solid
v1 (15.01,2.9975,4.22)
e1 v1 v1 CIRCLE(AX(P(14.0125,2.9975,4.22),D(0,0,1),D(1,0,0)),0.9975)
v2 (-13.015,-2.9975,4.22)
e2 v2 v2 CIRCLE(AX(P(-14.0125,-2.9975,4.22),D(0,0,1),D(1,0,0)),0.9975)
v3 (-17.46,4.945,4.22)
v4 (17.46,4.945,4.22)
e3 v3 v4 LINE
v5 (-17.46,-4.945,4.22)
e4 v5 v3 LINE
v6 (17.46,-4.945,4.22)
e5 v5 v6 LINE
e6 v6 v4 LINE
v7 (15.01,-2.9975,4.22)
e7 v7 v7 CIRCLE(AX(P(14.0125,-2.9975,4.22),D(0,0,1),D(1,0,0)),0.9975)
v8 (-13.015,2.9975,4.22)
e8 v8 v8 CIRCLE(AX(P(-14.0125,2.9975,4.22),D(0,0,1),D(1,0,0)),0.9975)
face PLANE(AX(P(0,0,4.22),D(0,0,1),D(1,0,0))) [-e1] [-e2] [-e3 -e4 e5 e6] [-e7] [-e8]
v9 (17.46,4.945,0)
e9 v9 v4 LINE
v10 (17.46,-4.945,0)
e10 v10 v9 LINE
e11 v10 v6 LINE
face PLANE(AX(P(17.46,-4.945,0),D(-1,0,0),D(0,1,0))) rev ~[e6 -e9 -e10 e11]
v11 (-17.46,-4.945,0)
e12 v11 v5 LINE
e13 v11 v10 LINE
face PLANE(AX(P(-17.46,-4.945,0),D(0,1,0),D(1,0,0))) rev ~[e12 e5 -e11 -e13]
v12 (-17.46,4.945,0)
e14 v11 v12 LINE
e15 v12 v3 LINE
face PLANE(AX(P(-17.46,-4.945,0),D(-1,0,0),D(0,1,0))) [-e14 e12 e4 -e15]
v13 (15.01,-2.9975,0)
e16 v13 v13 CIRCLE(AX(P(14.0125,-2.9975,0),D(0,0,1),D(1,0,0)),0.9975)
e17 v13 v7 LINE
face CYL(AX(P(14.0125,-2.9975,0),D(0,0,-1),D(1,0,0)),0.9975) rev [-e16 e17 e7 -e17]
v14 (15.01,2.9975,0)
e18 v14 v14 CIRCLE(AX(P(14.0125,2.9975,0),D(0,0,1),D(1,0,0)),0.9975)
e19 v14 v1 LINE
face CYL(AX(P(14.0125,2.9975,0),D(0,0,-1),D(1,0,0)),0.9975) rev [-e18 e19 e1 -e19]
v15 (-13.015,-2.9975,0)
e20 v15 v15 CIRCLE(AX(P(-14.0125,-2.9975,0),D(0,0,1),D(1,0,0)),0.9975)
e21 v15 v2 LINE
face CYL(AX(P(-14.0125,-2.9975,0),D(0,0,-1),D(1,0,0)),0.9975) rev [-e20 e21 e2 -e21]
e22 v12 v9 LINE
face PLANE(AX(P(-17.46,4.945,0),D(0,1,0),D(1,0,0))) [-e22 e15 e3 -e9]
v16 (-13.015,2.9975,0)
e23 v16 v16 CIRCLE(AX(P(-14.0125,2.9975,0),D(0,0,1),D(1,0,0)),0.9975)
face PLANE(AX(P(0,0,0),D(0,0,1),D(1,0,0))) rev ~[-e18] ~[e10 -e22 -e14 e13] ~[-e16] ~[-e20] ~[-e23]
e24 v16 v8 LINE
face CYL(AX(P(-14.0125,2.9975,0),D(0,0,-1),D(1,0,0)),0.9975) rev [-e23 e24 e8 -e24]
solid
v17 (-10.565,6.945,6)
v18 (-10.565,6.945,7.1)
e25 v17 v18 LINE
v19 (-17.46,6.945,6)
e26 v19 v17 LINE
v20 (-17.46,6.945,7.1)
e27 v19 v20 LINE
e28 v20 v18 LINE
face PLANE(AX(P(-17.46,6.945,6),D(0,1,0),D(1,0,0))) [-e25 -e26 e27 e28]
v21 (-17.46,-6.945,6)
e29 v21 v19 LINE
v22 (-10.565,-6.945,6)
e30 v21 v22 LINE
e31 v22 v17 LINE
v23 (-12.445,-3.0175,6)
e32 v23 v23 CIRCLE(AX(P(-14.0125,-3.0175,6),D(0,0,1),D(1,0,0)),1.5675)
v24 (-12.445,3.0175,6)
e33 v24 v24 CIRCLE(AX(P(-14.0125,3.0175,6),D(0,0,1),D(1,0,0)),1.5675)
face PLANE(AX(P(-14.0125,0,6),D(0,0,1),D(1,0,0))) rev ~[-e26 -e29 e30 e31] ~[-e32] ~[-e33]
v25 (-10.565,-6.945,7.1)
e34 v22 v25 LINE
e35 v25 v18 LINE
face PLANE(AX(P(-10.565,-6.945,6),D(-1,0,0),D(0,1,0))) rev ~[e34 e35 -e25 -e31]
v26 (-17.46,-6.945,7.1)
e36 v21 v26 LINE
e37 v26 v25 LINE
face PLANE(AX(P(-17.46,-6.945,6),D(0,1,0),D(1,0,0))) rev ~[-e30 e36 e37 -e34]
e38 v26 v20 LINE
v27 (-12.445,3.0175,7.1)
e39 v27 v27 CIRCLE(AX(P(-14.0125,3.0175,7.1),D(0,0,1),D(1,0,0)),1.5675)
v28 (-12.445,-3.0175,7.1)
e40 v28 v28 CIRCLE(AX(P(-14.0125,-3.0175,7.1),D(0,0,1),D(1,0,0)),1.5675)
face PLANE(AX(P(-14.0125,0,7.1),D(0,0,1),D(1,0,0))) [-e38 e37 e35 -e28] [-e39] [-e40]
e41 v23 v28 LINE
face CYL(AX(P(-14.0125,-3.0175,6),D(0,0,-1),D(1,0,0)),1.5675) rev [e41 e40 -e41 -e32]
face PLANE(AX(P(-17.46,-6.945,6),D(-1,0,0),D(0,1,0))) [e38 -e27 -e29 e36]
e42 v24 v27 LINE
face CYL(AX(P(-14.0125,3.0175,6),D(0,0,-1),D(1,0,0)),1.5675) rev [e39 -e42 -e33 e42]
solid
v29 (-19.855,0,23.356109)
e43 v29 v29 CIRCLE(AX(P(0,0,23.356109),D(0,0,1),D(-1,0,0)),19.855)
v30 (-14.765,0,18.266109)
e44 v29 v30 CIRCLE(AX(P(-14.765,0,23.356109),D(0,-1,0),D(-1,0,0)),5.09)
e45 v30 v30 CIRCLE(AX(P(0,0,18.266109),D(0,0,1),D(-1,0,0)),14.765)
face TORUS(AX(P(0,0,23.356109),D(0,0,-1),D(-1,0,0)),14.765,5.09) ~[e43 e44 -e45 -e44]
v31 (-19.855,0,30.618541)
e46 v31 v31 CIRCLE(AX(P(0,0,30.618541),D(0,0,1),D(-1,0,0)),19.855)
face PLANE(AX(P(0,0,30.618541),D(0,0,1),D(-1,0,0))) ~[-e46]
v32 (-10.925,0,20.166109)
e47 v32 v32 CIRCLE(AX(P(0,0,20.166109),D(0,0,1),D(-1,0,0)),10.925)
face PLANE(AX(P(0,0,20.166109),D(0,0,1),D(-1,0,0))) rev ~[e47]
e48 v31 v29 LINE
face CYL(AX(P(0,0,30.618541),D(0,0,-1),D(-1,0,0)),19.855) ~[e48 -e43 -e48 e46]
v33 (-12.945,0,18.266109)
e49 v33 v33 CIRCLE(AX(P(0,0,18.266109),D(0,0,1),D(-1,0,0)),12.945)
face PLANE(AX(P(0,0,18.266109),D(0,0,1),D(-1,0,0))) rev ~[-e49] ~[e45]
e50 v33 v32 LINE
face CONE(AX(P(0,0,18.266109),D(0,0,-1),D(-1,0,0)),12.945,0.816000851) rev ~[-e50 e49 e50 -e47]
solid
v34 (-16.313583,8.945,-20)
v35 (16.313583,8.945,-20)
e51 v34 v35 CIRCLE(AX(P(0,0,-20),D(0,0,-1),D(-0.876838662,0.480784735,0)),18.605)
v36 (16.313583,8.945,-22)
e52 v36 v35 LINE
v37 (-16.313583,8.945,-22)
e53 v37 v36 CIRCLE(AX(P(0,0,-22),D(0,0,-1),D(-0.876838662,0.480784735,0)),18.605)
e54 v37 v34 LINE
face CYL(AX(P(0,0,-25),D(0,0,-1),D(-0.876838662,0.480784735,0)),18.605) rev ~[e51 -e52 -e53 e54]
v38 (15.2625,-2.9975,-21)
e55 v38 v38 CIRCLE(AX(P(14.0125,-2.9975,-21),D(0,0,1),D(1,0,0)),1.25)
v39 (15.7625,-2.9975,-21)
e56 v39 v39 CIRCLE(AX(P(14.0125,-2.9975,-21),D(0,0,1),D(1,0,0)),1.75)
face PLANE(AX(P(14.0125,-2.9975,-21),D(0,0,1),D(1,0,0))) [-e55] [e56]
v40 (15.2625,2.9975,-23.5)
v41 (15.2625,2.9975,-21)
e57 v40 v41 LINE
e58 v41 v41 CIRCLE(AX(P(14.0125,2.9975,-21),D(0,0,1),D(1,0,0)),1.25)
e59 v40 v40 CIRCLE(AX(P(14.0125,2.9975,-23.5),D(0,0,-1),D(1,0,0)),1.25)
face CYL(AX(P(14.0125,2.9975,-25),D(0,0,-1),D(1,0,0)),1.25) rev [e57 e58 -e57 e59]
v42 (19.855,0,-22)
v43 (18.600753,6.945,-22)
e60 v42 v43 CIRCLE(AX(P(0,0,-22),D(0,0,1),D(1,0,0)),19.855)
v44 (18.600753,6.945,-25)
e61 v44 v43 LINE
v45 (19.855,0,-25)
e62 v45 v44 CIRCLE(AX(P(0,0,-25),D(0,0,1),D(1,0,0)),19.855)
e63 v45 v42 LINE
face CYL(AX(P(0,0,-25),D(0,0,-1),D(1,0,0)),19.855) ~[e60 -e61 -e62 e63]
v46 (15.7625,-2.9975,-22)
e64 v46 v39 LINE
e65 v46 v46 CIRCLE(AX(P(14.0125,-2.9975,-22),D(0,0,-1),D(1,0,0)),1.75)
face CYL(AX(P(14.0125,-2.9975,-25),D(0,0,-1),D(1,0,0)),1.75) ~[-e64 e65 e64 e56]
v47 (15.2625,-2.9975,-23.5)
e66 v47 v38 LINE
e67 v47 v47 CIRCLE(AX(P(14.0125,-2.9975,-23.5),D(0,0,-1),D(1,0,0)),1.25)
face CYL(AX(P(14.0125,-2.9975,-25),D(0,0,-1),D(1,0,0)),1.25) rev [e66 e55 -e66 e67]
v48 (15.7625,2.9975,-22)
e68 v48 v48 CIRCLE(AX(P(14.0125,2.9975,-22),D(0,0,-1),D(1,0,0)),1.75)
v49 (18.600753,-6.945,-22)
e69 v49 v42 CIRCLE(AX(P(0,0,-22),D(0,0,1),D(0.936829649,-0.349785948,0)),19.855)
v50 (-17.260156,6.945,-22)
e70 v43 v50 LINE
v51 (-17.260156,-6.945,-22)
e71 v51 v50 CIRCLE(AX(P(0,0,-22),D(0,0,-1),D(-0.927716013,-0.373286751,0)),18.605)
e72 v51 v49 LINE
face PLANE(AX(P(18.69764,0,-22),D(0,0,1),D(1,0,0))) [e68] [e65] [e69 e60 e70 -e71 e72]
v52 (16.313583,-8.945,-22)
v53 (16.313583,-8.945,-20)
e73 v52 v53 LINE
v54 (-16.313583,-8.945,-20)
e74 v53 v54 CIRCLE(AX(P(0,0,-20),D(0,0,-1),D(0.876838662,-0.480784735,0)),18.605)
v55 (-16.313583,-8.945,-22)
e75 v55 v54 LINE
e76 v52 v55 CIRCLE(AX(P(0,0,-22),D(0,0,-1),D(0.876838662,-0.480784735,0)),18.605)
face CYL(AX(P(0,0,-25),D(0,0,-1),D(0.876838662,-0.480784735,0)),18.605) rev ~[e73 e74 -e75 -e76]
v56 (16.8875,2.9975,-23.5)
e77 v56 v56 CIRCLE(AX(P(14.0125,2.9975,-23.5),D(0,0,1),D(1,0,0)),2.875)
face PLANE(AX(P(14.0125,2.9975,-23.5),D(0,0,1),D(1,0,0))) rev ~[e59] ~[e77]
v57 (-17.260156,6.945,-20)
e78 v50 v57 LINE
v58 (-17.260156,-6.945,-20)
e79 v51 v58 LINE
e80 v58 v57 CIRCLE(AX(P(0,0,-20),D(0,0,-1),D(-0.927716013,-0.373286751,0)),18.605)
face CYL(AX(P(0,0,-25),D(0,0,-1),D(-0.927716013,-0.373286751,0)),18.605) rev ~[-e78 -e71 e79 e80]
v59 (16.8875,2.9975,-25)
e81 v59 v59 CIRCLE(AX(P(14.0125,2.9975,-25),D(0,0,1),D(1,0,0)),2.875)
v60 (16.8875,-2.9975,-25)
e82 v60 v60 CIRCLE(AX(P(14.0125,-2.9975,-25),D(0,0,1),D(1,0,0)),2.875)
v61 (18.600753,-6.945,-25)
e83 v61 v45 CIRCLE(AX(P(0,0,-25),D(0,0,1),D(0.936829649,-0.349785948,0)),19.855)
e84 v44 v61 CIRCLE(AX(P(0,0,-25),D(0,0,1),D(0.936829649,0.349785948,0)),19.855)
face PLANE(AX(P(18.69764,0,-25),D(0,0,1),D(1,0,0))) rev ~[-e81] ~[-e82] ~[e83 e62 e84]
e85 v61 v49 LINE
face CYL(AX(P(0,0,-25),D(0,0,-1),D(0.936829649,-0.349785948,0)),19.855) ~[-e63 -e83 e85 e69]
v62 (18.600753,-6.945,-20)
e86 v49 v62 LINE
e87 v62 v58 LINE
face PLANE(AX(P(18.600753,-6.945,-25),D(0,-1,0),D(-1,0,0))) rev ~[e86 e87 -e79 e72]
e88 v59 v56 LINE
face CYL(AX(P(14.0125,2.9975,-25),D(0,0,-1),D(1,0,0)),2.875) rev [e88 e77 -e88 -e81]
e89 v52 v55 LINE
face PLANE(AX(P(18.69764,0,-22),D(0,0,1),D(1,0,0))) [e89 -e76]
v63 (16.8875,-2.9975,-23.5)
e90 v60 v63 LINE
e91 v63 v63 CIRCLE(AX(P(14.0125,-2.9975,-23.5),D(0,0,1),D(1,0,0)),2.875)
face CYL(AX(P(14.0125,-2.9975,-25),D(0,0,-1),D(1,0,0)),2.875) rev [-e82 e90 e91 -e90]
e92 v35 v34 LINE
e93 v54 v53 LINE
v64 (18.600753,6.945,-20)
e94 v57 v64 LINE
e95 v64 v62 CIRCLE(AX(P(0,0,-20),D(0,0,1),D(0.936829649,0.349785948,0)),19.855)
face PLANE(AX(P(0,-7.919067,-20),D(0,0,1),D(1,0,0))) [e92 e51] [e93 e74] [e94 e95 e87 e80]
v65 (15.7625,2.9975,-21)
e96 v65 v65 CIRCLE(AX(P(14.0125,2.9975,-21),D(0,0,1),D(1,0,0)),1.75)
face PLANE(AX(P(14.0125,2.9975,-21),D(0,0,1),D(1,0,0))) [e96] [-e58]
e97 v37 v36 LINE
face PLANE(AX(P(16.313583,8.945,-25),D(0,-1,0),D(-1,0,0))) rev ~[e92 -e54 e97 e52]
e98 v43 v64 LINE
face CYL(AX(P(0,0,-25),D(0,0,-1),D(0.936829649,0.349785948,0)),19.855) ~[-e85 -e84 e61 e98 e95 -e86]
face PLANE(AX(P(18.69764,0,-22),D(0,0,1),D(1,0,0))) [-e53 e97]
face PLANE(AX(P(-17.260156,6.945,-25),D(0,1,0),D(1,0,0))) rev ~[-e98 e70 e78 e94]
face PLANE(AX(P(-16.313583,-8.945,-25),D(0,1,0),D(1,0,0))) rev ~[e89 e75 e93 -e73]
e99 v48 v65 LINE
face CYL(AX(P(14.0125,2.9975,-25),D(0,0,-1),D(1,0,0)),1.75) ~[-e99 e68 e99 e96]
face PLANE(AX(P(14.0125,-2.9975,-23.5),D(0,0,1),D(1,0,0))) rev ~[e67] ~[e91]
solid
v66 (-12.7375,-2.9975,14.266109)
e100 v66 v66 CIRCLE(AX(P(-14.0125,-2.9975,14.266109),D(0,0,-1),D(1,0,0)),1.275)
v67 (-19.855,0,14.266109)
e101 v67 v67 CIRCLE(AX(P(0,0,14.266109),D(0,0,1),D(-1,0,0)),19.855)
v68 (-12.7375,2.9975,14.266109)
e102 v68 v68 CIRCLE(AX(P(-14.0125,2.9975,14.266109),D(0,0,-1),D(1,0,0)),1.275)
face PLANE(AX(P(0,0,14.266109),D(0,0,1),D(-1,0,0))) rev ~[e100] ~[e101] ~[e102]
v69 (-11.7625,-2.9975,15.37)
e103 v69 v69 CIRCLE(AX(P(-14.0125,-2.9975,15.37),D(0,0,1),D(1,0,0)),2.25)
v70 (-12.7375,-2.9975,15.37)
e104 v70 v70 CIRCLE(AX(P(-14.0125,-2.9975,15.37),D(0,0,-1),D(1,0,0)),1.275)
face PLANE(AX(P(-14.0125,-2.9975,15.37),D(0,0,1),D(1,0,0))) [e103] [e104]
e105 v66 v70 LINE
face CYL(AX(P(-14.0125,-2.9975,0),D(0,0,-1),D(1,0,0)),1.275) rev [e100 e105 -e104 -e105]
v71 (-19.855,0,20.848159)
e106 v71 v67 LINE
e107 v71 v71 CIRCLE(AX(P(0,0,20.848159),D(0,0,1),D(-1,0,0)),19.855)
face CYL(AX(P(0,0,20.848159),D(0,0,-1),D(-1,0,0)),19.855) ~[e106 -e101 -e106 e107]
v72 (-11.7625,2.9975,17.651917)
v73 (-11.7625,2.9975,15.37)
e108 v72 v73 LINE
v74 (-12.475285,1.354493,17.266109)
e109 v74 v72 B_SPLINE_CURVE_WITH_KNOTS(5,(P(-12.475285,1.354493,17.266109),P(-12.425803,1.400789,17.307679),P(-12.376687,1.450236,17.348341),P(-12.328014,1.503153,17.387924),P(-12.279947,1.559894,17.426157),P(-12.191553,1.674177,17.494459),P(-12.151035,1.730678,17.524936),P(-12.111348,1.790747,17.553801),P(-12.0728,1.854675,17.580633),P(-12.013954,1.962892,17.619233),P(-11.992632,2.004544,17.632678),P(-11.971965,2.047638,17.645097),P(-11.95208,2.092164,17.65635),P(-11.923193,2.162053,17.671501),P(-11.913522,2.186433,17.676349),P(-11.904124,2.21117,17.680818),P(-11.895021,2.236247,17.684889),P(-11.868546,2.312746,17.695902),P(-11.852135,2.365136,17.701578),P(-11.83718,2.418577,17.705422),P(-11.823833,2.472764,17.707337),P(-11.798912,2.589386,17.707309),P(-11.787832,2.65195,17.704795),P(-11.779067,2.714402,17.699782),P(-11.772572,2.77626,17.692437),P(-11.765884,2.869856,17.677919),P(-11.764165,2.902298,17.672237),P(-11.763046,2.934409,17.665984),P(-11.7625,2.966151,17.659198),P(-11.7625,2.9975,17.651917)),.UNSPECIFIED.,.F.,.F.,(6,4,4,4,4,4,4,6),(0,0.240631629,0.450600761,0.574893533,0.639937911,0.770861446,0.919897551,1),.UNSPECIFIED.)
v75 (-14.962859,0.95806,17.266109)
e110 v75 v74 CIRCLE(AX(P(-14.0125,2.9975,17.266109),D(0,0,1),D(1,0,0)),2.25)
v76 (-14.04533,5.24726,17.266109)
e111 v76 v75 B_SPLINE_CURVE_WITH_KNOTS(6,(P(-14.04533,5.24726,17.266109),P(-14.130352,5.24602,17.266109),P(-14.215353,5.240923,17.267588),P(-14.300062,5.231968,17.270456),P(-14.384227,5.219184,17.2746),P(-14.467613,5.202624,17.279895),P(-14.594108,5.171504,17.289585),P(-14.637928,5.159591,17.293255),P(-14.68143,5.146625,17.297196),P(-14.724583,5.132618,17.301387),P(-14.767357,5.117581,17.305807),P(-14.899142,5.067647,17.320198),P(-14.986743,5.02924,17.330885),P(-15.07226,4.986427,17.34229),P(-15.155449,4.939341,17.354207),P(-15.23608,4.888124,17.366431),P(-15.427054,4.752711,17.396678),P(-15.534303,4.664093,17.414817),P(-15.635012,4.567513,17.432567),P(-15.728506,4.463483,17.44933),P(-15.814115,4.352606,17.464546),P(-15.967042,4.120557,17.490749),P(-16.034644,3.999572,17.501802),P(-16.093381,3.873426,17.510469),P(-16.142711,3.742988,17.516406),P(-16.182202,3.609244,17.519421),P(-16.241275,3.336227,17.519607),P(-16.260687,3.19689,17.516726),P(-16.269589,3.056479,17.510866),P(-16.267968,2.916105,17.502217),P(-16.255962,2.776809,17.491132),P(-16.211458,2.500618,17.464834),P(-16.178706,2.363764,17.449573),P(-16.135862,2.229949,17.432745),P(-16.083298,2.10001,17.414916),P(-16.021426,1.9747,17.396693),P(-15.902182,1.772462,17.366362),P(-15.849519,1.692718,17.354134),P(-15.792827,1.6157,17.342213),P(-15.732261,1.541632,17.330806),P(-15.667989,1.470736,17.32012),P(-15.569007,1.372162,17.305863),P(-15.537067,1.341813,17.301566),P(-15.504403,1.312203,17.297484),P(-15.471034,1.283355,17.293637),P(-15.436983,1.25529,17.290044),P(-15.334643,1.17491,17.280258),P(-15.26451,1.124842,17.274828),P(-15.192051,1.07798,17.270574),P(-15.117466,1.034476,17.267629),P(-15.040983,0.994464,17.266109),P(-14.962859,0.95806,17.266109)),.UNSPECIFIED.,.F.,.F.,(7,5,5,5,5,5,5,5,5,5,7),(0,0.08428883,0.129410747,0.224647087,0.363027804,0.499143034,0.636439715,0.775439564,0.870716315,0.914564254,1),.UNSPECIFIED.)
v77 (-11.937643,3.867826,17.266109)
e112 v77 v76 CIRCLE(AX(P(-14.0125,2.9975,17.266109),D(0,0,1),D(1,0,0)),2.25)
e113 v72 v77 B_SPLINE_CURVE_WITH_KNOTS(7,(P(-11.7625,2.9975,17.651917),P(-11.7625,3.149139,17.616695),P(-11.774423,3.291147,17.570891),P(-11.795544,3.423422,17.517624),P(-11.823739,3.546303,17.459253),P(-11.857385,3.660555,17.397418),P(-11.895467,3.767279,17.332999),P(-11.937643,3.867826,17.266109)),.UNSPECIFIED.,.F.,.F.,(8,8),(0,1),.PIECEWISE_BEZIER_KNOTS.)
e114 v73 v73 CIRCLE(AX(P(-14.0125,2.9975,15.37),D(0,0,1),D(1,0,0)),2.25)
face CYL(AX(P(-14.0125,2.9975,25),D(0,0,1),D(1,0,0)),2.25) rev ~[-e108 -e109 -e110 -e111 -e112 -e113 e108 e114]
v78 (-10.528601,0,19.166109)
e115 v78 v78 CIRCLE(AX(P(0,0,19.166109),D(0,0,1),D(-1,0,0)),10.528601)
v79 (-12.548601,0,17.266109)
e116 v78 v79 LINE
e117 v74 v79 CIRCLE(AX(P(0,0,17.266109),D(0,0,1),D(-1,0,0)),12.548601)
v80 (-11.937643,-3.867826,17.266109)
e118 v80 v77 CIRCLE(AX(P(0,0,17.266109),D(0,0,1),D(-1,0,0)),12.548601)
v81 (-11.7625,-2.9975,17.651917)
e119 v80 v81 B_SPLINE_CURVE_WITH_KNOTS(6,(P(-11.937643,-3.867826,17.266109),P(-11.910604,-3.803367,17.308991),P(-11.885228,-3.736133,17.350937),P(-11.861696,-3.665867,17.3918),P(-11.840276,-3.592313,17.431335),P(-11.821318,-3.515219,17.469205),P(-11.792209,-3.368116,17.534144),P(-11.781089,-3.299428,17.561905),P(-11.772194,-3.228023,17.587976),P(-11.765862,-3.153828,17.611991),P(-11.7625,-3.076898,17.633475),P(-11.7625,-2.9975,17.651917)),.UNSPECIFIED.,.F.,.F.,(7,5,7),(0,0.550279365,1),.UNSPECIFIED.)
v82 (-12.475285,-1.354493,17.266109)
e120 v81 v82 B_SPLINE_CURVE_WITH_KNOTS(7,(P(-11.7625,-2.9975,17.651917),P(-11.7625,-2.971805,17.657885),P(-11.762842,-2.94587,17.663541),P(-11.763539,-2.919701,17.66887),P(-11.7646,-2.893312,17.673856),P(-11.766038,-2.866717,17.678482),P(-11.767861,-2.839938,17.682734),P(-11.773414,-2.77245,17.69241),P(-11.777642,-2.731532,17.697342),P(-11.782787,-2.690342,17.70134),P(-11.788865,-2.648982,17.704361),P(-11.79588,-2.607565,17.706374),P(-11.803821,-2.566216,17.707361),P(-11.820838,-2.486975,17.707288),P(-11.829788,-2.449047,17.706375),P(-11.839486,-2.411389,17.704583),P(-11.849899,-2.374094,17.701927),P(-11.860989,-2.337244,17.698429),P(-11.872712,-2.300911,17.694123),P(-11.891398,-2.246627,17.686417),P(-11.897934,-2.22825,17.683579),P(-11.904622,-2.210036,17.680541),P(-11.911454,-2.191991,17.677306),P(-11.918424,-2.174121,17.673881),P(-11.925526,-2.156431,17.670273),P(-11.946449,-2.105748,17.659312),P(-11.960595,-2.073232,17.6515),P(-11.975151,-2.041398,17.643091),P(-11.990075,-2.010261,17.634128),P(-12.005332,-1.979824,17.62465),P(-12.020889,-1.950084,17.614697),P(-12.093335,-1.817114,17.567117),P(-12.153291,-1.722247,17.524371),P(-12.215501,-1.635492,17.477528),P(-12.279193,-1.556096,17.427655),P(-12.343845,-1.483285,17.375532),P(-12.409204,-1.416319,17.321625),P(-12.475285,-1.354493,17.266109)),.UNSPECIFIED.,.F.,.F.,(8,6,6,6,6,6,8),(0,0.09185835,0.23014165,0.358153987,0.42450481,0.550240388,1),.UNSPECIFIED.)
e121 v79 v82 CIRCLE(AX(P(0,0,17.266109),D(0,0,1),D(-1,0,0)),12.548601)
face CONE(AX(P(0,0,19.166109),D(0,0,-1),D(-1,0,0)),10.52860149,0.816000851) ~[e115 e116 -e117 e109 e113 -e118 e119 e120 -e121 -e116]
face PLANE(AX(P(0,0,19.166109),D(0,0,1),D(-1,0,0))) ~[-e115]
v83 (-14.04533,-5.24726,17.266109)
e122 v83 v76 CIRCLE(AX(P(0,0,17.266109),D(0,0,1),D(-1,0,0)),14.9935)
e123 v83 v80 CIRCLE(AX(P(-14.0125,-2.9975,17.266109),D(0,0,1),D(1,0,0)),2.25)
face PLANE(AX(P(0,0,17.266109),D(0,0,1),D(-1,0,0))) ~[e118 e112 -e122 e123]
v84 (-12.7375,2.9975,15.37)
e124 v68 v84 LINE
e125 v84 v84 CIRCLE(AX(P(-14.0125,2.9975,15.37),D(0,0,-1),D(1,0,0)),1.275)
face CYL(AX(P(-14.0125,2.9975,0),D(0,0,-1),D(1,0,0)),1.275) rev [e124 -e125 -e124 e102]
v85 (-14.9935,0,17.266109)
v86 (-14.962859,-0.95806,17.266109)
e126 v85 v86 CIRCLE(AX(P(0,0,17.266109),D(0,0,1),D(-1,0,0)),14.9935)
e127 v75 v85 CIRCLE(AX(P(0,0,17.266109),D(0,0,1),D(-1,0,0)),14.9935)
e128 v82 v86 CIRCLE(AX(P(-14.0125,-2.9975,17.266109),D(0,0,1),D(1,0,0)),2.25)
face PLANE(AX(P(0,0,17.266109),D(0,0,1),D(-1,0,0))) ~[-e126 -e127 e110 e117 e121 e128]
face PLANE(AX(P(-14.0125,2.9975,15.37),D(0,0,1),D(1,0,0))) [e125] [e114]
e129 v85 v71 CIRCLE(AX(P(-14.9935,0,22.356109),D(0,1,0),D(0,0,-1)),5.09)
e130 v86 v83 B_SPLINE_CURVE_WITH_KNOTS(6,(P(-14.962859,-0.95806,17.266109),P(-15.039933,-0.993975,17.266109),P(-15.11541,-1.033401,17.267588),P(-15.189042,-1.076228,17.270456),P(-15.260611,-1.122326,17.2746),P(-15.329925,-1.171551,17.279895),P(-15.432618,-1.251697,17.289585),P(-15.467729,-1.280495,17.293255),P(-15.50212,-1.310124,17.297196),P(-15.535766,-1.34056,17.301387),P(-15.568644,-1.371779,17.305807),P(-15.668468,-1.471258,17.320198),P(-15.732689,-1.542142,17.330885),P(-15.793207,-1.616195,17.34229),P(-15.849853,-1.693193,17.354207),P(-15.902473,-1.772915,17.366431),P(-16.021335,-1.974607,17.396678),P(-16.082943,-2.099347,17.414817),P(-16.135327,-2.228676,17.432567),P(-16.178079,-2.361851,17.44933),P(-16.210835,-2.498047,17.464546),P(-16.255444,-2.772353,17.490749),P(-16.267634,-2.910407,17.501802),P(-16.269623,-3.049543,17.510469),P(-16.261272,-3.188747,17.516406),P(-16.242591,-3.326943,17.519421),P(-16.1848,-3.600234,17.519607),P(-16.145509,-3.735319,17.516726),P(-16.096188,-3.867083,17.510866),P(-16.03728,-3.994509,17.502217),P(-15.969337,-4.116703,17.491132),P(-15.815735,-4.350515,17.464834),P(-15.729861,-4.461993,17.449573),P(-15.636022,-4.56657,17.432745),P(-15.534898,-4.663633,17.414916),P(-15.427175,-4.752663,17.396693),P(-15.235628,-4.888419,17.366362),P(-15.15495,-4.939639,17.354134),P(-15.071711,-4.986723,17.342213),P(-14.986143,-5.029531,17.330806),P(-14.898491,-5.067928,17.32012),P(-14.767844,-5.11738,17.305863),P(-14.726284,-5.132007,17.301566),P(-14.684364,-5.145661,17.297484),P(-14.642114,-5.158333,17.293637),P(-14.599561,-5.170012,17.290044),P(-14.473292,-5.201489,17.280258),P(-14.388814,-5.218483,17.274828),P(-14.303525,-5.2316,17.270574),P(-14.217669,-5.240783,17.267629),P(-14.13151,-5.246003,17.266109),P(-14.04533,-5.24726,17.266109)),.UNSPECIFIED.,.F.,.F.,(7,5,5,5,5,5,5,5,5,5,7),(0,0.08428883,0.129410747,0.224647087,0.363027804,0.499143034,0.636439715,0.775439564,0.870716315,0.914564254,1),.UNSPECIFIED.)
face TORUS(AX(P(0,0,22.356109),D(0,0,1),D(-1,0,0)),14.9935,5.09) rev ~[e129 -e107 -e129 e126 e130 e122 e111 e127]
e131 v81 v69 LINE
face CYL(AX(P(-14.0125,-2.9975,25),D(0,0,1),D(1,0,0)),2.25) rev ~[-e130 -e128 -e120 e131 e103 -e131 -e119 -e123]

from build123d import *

# Parameters (mm, degrees)
F2_W      = 34.92
F2_H      = 9.89
F2_R      = 1.275
F2_R_2    = 0.9975
F3_DEPTH  = 4.22
F4_DEPTH  = 25
F8_W      = 6.895
F8_H      = 13.89
F8_R      = 1.5675
F9_DEPTH  = 1.1
F11_R     = 1.75
F11_R_2   = 1.25
F12_DEPTH = 3
F13_DEPTH = 4
F14_DEPTH = 5
F6_R      = 2.25
F15_DEPTH = 9.63
F16_R     = 2.875
F17_DEPTH = 1.5


with BuildPart() as f1:
    # F0 (on Front) → F1 (revolve)
    with BuildSketch(Plane.XZ):
        with BuildLine():
            Line((-14.765, 18.2661092722), (-12.945, 18.2661092722))
            Line((-12.945, 18.2661092722), (-10.925, 20.1661092722))
            Line((-10.925, 20.1661092722), (0, 20.1661092722))
            Line((0, 20.1661092722), (0, 30.6185409427))
            Line((0, 30.6185409427), (-19.855, 30.6185409427))
            Line((-19.855, 30.6185409427), (-19.855, 23.3561092722))
            ThreePointArc((-19.855, 23.3561092722), (-18.3641735162, 19.756935756), (-14.765, 18.2661092722))
        make_face()
    revolve(axis=Axis((0, 0, 17.6021158695), (0, 0, 1)))


with BuildPart() as f1b:
    # F0 (on Front) → F1, piece 2 (revolve)
    with BuildSketch(Plane.XZ):
        with BuildLine():
            Line((-10.5286014899, 19.1661091083), (-12.5486014899, 17.2661091083))
            Line((-12.5486014899, 17.2661091083), (-14.9934996444, 17.2661091083))
            ThreePointArc((-14.9934996444, 17.2661091083), (-18.0128234644, 18.2583312142), (-19.855, 20.848158747))
            Line((-19.855, 20.848158747), (-19.855, 14.2661091083))
            Line((-19.855, 14.2661091083), (0, 14.2661091083))
            Line((0, 14.2661091083), (0, 19.1661091083))
            Line((0, 19.1661091083), (-10.5286014899, 19.1661091083))
        make_face()
    revolve(axis=Axis((0, 0, 17.6021158695), (0, 0, 1)))

    # F2 (on Top) → F4 (cut)
    with BuildSketch(Plane.XY):
        with Locations((-14.0125, -2.9975)):
            Circle(F2_R)
        with Locations((-14.0125, -2.9975)):
            Circle(F2_R_2, mode=Mode.SUBTRACT)
        with Locations((-14.0125, 2.9975)):
            Circle(F2_R)
        with Locations((-14.0125, 2.9975)):
            Circle(F2_R_2, mode=Mode.SUBTRACT)
        with Locations((-14.0125, -2.9975)):
            Circle(F2_R_2)
        with Locations((-14.0125, 2.9975)):
            Circle(F2_R_2)
    extrude(amount=F4_DEPTH, mode=Mode.SUBTRACT)

    # F6 (on offset) → F15 (cut)
    with BuildSketch(Plane.XY.offset(25)):
        with Locations((-14.0125, 2.9975)):
            Circle(F6_R)
        with Locations((-14.0125, -2.9975)):
            Circle(F6_R)
    extrude(amount=-F15_DEPTH, mode=Mode.SUBTRACT)


with BuildPart() as f3:
    # F2 (on Top) → F3 (new body)
    with BuildSketch(Plane.XY):
        Rectangle(F2_W, F2_H)
        with Locations((-14.0125, -2.9975)):
            Circle(F2_R, mode=Mode.SUBTRACT)
        with Locations((14.0125, -2.9975)):
            Circle(F2_R, mode=Mode.SUBTRACT)
        with Locations((-14.0125, 2.9975)):
            Circle(F2_R, mode=Mode.SUBTRACT)
        with Locations((14.0125, 2.9975)):
            Circle(F2_R, mode=Mode.SUBTRACT)
        with Locations((-14.0125, 2.9975)):
            Circle(F2_R)
        with Locations((-14.0125, 2.9975)):
            Circle(F2_R_2, mode=Mode.SUBTRACT)
        with Locations((-14.0125, -2.9975)):
            Circle(F2_R)
        with Locations((-14.0125, -2.9975)):
            Circle(F2_R_2, mode=Mode.SUBTRACT)
        with Locations((14.0125, 2.9975)):
            Circle(F2_R)
        with Locations((14.0125, 2.9975)):
            Circle(F2_R_2, mode=Mode.SUBTRACT)
        with Locations((14.0125, -2.9975)):
            Circle(F2_R)
        with Locations((14.0125, -2.9975)):
            Circle(F2_R_2, mode=Mode.SUBTRACT)
    extrude(amount=F3_DEPTH)


with BuildPart() as f9:
    # F8 (on offset) → F9 (new body)
    with BuildSketch(Plane.XY.offset(6)):
        with Locations((-14.0125, 0)):
            Rectangle(F8_W, F8_H)
        with Locations((-14.0125, -3.0175)):
            Circle(F8_R, mode=Mode.SUBTRACT)
        with Locations((-14.0125, 3.0175)):
            Circle(F8_R, mode=Mode.SUBTRACT)
    extrude(amount=F9_DEPTH)


with BuildPart() as f12:
    # F11 (on offset) → F12 (new body)
    with BuildSketch(Plane.XY.offset(-25)):
        with BuildLine():
            ThreePointArc((18.6007526729, -6.945), (19.5389223004, -3.52867402), (19.855, 0))
            ThreePointArc((19.855, 0), (19.5389223004, 3.52867402), (18.6007526729, 6.945))
            Line((18.6007526729, 6.945), (17.2601564303, 6.945))
            ThreePointArc((17.2601564303, 6.945), (18.2656951057, 3.5370054151), (18.605, 0))
            ThreePointArc((18.605, 0), (18.2656951057, -3.5370054151), (17.2601564303, -6.945))
            Line((17.2601564303, -6.945), (18.6007526729, -6.945))
        make_face()
        with BuildLine():
            Line((17.2601564303, 6.945), (18.6007526729, 6.945))
            ThreePointArc((18.6007526729, 6.945), (-19.855, 0), (18.6007526729, -6.945))
            Line((18.6007526729, -6.945), (17.2601564303, -6.945))
            ThreePointArc((17.2601564303, -6.945), (16.81662867, -7.9590844432), (16.3135832974, -8.945))
            ThreePointArc((16.3135832974, -8.945), (0, -18.605), (-16.3135832974, -8.945))
            ThreePointArc((-16.3135832974, -8.945), (-16.81662867, -7.9590844432), (-17.2601564303, -6.945))
            ThreePointArc((-17.2601564303, -6.945), (-18.605, 0), (-17.2601564303, 6.945))
            ThreePointArc((-17.2601564303, 6.945), (-16.81662867, 7.9590844432), (-16.3135832974, 8.945))
            ThreePointArc((-16.3135832974, 8.945), (0, 18.605), (16.3135832974, 8.945))
            ThreePointArc((16.3135832974, 8.945), (16.81662867, 7.9590844432), (17.2601564303, 6.945))
        make_face()
        with BuildLine():
            ThreePointArc((-16.3135832974, -8.945), (0, -18.605), (16.3135832974, -8.945))
            Line((16.3135832974, -8.945), (-16.3135832974, -8.945))
        make_face()
        with BuildLine():
            ThreePointArc((16.3135832974, -8.945), (16.81662867, -7.9590844432), (17.2601564303, -6.945))
            Line((17.2601564303, -6.945), (-17.2601564303, -6.945))
            ThreePointArc((-17.2601564303, -6.945), (-16.81662867, -7.9590844432), (-16.3135832974, -8.945))
            Line((-16.3135832974, -8.945), (16.3135832974, -8.945))
        make_face()
        with BuildLine():
            ThreePointArc((18.605, 0), (18.2656951057, 3.5370054151), (17.2601564303, 6.945))
            Line((17.2601564303, 6.945), (-17.2601564303, 6.945))
            ThreePointArc((-17.2601564303, 6.945), (-18.605, 0), (-17.2601564303, -6.945))
            Line((-17.2601564303, -6.945), (17.2601564303, -6.945))
            ThreePointArc((17.2601564303, -6.945), (18.2656951057, -3.5370054151), (18.605, 0))
        make_face()
        with Locations((14.0125, -2.9975)):
            Circle(F11_R, mode=Mode.SUBTRACT)
        with Locations((14.0125, 2.9975)):
            Circle(F11_R, mode=Mode.SUBTRACT)
        with BuildLine():
            Line((-17.2601564303, 6.945), (17.2601564303, 6.945))
            ThreePointArc((17.2601564303, 6.945), (16.81662867, 7.9590844432), (16.3135832974, 8.945))
            Line((16.3135832974, 8.945), (-16.3135832974, 8.945))
            ThreePointArc((-16.3135832974, 8.945), (-16.81662867, 7.9590844432), (-17.2601564303, 6.945))
        make_face()
        with BuildLine():
            Line((-16.3135832974, 8.945), (16.3135832974, 8.945))
            ThreePointArc((16.3135832974, 8.945), (0, 18.605), (-16.3135832974, 8.945))
        make_face()
        with Locations((14.0125, -2.9975)):
            Circle(F11_R)
        with Locations((14.0125, -2.9975)):
            Circle(F11_R_2, mode=Mode.SUBTRACT)
        with Locations((14.0125, 2.9975)):
            Circle(F11_R)
        with Locations((14.0125, 2.9975)):
            Circle(F11_R_2, mode=Mode.SUBTRACT)
    extrude(amount=F12_DEPTH)

    # F11 (on offset) → F13 (join)
    with BuildSketch(Plane.XY.offset(-25)):
        with Locations((14.0125, -2.9975)):
            Circle(F11_R)
        with Locations((14.0125, -2.9975)):
            Circle(F11_R_2, mode=Mode.SUBTRACT)
        with Locations((14.0125, 2.9975)):
            Circle(F11_R)
        with Locations((14.0125, 2.9975)):
            Circle(F11_R_2, mode=Mode.SUBTRACT)
    extrude(amount=F13_DEPTH)

    # F11 (on offset) → F14 (join)
    with BuildSketch(Plane.XY.offset(-25)):
        with BuildLine():
            ThreePointArc((16.3135832974, -8.945), (16.81662867, -7.9590844432), (17.2601564303, -6.945))
            Line((17.2601564303, -6.945), (-17.2601564303, -6.945))
            ThreePointArc((-17.2601564303, -6.945), (-16.81662867, -7.9590844432), (-16.3135832974, -8.945))
            Line((-16.3135832974, -8.945), (16.3135832974, -8.945))
        make_face()
        with BuildLine():
            Line((17.2601564303, 6.945), (18.6007526729, 6.945))
            ThreePointArc((18.6007526729, 6.945), (-19.855, 0), (18.6007526729, -6.945))
            Line((18.6007526729, -6.945), (17.2601564303, -6.945))
            ThreePointArc((17.2601564303, -6.945), (16.81662867, -7.9590844432), (16.3135832974, -8.945))
            ThreePointArc((16.3135832974, -8.945), (0, -18.605), (-16.3135832974, -8.945))
            ThreePointArc((-16.3135832974, -8.945), (-16.81662867, -7.9590844432), (-17.2601564303, -6.945))
            ThreePointArc((-17.2601564303, -6.945), (-18.605, 0), (-17.2601564303, 6.945))
            ThreePointArc((-17.2601564303, 6.945), (-16.81662867, 7.9590844432), (-16.3135832974, 8.945))
            ThreePointArc((-16.3135832974, 8.945), (0, 18.605), (16.3135832974, 8.945))
            ThreePointArc((16.3135832974, 8.945), (16.81662867, 7.9590844432), (17.2601564303, 6.945))
        make_face()
        with BuildLine():
            Line((-17.2601564303, 6.945), (17.2601564303, 6.945))
            ThreePointArc((17.2601564303, 6.945), (16.81662867, 7.9590844432), (16.3135832974, 8.945))
            Line((16.3135832974, 8.945), (-16.3135832974, 8.945))
            ThreePointArc((-16.3135832974, 8.945), (-16.81662867, 7.9590844432), (-17.2601564303, 6.945))
        make_face()
    extrude(amount=F14_DEPTH)

    # F16 (on offset) → F17 (cut)
    with BuildSketch(Plane.XY.offset(-25)):
        with Locations((14.0125, -2.9975)):
            Circle(F16_R)
        with Locations((14.0125, 2.9975)):
            Circle(F16_R)
    extrude(amount=F17_DEPTH, mode=Mode.SUBTRACT)


solid = Compound([f1.part, f1b.part, f3.part, f9.part, f12.part])
